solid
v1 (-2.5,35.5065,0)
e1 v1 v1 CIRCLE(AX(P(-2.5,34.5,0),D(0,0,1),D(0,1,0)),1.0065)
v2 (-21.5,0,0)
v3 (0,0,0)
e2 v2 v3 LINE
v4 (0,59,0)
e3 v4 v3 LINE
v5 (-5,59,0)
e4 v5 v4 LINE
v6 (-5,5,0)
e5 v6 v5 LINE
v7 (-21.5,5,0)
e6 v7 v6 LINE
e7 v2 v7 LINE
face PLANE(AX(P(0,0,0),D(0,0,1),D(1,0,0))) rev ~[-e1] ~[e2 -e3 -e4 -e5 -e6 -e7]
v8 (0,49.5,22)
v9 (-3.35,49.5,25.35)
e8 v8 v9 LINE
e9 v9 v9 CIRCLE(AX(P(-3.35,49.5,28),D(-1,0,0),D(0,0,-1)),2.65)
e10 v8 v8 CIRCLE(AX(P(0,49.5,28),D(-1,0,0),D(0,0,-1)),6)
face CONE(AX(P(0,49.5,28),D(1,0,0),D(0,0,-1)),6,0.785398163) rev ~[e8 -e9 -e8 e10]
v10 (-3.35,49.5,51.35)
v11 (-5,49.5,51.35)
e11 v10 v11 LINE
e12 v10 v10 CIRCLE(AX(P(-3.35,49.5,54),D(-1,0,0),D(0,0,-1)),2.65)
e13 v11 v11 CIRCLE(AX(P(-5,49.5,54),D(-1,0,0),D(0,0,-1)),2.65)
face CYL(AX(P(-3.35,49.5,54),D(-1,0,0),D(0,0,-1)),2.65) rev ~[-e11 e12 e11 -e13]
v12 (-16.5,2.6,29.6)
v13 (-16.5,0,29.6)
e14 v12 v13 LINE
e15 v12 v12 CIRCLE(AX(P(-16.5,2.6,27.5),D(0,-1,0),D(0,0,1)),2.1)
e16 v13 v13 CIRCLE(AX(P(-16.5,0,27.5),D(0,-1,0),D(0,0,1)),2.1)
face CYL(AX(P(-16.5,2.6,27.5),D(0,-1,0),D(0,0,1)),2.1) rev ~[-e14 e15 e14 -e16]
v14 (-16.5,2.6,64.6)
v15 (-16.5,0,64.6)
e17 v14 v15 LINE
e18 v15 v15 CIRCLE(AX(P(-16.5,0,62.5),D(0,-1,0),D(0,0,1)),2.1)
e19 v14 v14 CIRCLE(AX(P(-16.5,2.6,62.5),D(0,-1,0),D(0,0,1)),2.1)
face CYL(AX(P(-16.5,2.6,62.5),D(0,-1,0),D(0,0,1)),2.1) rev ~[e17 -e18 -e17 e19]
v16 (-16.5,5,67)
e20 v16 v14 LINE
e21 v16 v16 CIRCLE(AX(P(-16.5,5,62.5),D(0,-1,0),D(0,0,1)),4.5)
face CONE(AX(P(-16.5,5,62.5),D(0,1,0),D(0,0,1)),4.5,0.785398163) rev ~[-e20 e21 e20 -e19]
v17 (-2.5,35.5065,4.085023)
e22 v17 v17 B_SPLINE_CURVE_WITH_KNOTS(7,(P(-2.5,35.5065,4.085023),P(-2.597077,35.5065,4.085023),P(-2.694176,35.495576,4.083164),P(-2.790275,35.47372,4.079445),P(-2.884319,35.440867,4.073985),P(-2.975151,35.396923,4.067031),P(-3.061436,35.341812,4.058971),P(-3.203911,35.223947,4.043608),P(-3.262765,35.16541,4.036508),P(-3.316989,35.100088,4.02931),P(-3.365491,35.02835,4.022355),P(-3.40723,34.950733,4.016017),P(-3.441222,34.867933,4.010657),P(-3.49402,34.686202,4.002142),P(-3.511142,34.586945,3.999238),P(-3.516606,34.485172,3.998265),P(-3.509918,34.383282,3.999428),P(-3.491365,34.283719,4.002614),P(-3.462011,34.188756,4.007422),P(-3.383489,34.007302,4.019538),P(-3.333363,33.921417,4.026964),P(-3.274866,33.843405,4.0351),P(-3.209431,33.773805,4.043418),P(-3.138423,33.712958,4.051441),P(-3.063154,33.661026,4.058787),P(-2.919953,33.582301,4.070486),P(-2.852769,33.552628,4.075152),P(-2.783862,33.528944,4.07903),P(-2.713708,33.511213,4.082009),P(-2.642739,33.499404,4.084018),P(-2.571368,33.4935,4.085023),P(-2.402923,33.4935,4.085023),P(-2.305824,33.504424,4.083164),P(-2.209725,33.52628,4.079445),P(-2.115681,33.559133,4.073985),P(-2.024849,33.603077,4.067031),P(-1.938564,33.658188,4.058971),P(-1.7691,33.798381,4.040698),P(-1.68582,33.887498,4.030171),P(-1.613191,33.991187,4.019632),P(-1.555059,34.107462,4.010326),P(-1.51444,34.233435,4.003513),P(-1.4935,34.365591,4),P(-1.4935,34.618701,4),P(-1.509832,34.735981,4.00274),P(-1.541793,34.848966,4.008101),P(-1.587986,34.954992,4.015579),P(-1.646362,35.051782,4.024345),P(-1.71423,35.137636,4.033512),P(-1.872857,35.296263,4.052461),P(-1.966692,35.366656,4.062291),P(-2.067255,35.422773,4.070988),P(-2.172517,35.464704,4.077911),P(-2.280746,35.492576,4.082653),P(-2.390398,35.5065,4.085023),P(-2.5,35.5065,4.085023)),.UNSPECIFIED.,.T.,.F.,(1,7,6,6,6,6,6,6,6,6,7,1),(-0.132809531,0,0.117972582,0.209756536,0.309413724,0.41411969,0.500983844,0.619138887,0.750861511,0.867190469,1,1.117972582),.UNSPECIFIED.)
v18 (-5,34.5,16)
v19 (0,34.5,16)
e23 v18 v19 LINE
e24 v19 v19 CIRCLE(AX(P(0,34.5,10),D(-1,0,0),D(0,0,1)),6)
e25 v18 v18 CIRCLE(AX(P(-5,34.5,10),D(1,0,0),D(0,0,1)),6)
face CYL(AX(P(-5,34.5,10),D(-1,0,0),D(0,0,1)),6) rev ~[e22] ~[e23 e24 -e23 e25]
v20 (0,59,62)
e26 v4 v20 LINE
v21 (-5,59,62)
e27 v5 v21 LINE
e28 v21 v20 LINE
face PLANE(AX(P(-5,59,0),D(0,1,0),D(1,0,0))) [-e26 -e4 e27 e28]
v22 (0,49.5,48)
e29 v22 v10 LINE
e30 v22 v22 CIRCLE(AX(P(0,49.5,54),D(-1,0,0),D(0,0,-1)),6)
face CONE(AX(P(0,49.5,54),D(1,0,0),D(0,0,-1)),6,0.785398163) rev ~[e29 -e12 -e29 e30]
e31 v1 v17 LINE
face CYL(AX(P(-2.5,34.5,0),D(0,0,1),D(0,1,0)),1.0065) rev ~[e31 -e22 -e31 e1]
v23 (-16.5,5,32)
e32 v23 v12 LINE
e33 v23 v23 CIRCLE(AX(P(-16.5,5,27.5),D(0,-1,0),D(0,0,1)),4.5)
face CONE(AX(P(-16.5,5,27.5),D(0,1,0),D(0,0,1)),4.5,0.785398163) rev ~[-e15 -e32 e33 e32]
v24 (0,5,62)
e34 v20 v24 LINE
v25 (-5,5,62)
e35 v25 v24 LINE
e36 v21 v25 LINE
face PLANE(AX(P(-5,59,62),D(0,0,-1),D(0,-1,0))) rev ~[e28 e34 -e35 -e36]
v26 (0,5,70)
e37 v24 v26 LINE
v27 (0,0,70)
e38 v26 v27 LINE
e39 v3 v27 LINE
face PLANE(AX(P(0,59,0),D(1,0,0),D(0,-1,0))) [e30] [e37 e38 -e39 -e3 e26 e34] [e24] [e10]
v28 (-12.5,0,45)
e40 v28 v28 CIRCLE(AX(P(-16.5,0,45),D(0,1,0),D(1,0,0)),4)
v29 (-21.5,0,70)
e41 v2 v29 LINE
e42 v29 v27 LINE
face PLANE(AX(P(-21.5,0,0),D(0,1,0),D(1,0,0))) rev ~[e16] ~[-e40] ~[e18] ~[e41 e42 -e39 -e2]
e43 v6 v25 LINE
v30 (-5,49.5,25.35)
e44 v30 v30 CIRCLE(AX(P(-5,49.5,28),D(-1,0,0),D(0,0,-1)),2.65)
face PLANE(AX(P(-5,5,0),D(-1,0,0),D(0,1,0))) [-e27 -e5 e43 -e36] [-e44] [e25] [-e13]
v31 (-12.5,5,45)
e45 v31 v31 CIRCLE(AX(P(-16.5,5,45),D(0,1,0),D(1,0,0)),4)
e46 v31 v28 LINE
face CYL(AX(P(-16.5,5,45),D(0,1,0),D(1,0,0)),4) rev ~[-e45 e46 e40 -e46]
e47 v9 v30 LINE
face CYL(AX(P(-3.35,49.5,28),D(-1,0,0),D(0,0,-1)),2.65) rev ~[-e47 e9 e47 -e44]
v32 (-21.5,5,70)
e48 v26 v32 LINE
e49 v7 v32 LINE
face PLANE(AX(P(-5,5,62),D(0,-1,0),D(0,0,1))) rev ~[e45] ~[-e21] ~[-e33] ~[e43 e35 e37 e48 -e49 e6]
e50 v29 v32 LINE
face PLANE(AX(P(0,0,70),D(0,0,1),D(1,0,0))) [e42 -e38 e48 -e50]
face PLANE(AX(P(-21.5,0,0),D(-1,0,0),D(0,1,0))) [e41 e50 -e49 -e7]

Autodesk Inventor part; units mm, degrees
ref_plane "YZ Plane" through (0, 0, 0) normal (1, 0, 0) x (0, 1, 0)
ref_plane "XZ Plane" through (0, 0, 0) normal (0, 1, 0) x (-1, 0, 0)
ref_plane "XY Plane" through (0, 0, 0) normal (0, 0, 1) x (1, 0, 0)
sketch "Skizze1" plane through (0, 0, 0) normal (0, 0, 1) x (1, 0, 0)
  line L0 (0, 70.8) -> (0, -11.8) projected
  line L1 (-25.8, 0) -> (4.3, 0) projected
  line L2 (-21.5, 0) -> (-21.5, 5)
  line L3 (-21.5, 5) -> (-5, 5)
  line L4 (-5, 5) -> (-5, 59)
  line L5 (-5, 59) -> (0, 59)
  line L6 (0, 59) -> (0, 0)
  line L7 (0, 0) -> (-21.5, 0)
  dimension "d0" = 16.5
  dimension "d1" = 5
  dimension "d2" = 5
  dimension "d3" = 54
extrude "Extrusion1" add sketch "Skizze1" along normal blind 70
sketch "Skizze2" plane through (-21.5, 5, 0) normal (0, 1, 0) x (1, 0, 0)
  line L0 (0, -70) -> (16.5, -70) projected
  line L1 (0, 0) -> (0, -70) projected
  point P0 (21.5, 0)
  point P1 (5, -62.5)
  point P2 (5, -27.5)
  dimension "d6" = 35
  dimension "d7" = 5
  dimension "d8" = 5
  dimension "d9" = 7.5
hole "Bohrung1" at (-16.5, 5, 62.5) at (-16.5, 5, 27.5) direction (0, -1, 0) diameter 4.2 end through all countersink diameter 9 countersink angle 90 clearance for "Innensechskant-Senkkopfschraube DIN EN ISO 10642" size "M4" standard "DIN"
sketch "Skizze3" plane through (-21.5, 5, 0) normal (0, 1, 0) x (1, 0, 0)
  circle A0 centre (5, -27.5) radius 4.5 projected
  circle A1 centre (5, -62.5) radius 4.5 projected
  line L0 (0, 0) -> (0, -70) projected
  line L1 (5, -62.5) -> (5, -27.5) construction
  circle A2 centre (5, -45) radius 4
  point P0 (21.5, 0)
  dimension "d18" = 17.5
  dimension "d19" = 8
extrude "Extrusion2" cut sketch "Skizze3" against normal up to surface (5 mm away) contours A2
sketch "Skizze4" plane through (0, 0, 0) normal (1, 0, 0) x (0, 0, -1)
  line L0 (-70, 59) -> (-70, 0) projected
  line L1 (0, 59) -> (-70, 59) projected
  circle A0 centre (-34, 39.5) radius 2.067 projected
  circle A1 centre (-8, 39.5) radius 2.067 projected
  point P0 (-54, 49.5)
  point P1 (-28, 49.5)
  dimension "d34" = 9.5
  dimension "d35" = 9.5
  dimension "d36" = 16
  dimension "d37" = 26
hole "Bohrung2" at (0, 49.5, 54) at (0, 49.5, 28) direction (-1, 0, 0) diameter 5.3 end through all countersink diameter 12 countersink angle 90 clearance for "Innensechskant-Senkkopfschraube DIN EN ISO 10642" size "M5" standard "DIN"
sketch "Skizze5" plane through (-5, 5, 0) normal (-1, 0, 0) x (0, 0, 1)
  line L0 (0, 54) -> (70, 54) projected
  line L1 (0, 54) -> (0, 0) projected
  circle A0 centre (10, 29.5) radius 6
  circle A1 centre (28, 44.5) radius 2.067 projected
  circle A2 centre (54, 44.5) radius 2.067 projected
  circle A3 centre (18.5, 60.5) radius 2.2 projected
  line L2 (62, 72) -> (62, 35) projected
  line L3 (62, 72) -> (-5.5, 72) projected
  arc A4 (-28, 90.2303) -> (-5.5, 72) centre (-5.5, 95) ccw projected
  line L4 (-28, 15) -> (-28, 90.2303) projected
  line L5 (-28, 15) -> (-18, 15) projected
  line L6 (-18, 35) -> (-18, 15) projected
  line L7 (62, 35) -> (-18, 35) projected
  circle A5 centre (28, 44.5) radius 2.65 projected
  circle A6 centre (54, 44.5) radius 2.65 projected
  line L8 (70, 0) -> (70, 54) projected
  line L9 (0, 54) -> (70, 54) projected
  line L10 (0, 54) -> (0, 0) projected
  line L11 (0, 0) -> (70, 0) projected
  line L12 (32.75, 18) -> (32.75, 106)
  point P0 (0, -5)
  dimension "d38" = 24.5
  dimension "d39" = 12
  dimension "d40" = 10
extrude "Extrusion3" cut sketch "Skizze5" against normal blind 5 contours L7 A0 | A0 L7
sketch "Skizze7" plane through (0, 0, 0) normal (0, 0, -1) x (-1, 0, 0)
  line L0 (0, 28.5) -> (0, 40.5) projected
  line L1 (0, 28.5) -> (0, 40.5) projected
  line L2 (5, 40.5) -> (5, 28.5) projected
  line L3 (5, 28.5) -> (0, 28.5) projected
  line L4 (5, 40.5) -> (0, 40.5) projected
  point P0 (2.5, 34.5)
hole "Bohrung3" at (-2.5, 34.5, 0) direction (0, 0, 1) diameter 2.013 end up to surface thread size "M2.5x0.45" class "6H" standard "ISO Metric profile"
sketch "Skizze8" plane through (-5, 5, 0) normal (-1, 0, 0) x (0, 0, 1)
  line L0 (0, 0) -> (70, 0) projected
  line L1 (70, 54) -> (62, 54)
  line L2 (62, 54) -> (62, 0)
  line L3 (62, 0) -> (70, 0)
  line L4 (70, 0) -> (70, 54)
  point P0 (0, -5)
  dimension "d50" = 8
extrude "Extrusion4" cut sketch "Skizze8" against normal blind 5
equation "\"d2\" = d1"
equation "\"d8\" = d7"
equation "\"d35\" = d34"
properties part number "Motorhalter" material "Aluminum-6061"
